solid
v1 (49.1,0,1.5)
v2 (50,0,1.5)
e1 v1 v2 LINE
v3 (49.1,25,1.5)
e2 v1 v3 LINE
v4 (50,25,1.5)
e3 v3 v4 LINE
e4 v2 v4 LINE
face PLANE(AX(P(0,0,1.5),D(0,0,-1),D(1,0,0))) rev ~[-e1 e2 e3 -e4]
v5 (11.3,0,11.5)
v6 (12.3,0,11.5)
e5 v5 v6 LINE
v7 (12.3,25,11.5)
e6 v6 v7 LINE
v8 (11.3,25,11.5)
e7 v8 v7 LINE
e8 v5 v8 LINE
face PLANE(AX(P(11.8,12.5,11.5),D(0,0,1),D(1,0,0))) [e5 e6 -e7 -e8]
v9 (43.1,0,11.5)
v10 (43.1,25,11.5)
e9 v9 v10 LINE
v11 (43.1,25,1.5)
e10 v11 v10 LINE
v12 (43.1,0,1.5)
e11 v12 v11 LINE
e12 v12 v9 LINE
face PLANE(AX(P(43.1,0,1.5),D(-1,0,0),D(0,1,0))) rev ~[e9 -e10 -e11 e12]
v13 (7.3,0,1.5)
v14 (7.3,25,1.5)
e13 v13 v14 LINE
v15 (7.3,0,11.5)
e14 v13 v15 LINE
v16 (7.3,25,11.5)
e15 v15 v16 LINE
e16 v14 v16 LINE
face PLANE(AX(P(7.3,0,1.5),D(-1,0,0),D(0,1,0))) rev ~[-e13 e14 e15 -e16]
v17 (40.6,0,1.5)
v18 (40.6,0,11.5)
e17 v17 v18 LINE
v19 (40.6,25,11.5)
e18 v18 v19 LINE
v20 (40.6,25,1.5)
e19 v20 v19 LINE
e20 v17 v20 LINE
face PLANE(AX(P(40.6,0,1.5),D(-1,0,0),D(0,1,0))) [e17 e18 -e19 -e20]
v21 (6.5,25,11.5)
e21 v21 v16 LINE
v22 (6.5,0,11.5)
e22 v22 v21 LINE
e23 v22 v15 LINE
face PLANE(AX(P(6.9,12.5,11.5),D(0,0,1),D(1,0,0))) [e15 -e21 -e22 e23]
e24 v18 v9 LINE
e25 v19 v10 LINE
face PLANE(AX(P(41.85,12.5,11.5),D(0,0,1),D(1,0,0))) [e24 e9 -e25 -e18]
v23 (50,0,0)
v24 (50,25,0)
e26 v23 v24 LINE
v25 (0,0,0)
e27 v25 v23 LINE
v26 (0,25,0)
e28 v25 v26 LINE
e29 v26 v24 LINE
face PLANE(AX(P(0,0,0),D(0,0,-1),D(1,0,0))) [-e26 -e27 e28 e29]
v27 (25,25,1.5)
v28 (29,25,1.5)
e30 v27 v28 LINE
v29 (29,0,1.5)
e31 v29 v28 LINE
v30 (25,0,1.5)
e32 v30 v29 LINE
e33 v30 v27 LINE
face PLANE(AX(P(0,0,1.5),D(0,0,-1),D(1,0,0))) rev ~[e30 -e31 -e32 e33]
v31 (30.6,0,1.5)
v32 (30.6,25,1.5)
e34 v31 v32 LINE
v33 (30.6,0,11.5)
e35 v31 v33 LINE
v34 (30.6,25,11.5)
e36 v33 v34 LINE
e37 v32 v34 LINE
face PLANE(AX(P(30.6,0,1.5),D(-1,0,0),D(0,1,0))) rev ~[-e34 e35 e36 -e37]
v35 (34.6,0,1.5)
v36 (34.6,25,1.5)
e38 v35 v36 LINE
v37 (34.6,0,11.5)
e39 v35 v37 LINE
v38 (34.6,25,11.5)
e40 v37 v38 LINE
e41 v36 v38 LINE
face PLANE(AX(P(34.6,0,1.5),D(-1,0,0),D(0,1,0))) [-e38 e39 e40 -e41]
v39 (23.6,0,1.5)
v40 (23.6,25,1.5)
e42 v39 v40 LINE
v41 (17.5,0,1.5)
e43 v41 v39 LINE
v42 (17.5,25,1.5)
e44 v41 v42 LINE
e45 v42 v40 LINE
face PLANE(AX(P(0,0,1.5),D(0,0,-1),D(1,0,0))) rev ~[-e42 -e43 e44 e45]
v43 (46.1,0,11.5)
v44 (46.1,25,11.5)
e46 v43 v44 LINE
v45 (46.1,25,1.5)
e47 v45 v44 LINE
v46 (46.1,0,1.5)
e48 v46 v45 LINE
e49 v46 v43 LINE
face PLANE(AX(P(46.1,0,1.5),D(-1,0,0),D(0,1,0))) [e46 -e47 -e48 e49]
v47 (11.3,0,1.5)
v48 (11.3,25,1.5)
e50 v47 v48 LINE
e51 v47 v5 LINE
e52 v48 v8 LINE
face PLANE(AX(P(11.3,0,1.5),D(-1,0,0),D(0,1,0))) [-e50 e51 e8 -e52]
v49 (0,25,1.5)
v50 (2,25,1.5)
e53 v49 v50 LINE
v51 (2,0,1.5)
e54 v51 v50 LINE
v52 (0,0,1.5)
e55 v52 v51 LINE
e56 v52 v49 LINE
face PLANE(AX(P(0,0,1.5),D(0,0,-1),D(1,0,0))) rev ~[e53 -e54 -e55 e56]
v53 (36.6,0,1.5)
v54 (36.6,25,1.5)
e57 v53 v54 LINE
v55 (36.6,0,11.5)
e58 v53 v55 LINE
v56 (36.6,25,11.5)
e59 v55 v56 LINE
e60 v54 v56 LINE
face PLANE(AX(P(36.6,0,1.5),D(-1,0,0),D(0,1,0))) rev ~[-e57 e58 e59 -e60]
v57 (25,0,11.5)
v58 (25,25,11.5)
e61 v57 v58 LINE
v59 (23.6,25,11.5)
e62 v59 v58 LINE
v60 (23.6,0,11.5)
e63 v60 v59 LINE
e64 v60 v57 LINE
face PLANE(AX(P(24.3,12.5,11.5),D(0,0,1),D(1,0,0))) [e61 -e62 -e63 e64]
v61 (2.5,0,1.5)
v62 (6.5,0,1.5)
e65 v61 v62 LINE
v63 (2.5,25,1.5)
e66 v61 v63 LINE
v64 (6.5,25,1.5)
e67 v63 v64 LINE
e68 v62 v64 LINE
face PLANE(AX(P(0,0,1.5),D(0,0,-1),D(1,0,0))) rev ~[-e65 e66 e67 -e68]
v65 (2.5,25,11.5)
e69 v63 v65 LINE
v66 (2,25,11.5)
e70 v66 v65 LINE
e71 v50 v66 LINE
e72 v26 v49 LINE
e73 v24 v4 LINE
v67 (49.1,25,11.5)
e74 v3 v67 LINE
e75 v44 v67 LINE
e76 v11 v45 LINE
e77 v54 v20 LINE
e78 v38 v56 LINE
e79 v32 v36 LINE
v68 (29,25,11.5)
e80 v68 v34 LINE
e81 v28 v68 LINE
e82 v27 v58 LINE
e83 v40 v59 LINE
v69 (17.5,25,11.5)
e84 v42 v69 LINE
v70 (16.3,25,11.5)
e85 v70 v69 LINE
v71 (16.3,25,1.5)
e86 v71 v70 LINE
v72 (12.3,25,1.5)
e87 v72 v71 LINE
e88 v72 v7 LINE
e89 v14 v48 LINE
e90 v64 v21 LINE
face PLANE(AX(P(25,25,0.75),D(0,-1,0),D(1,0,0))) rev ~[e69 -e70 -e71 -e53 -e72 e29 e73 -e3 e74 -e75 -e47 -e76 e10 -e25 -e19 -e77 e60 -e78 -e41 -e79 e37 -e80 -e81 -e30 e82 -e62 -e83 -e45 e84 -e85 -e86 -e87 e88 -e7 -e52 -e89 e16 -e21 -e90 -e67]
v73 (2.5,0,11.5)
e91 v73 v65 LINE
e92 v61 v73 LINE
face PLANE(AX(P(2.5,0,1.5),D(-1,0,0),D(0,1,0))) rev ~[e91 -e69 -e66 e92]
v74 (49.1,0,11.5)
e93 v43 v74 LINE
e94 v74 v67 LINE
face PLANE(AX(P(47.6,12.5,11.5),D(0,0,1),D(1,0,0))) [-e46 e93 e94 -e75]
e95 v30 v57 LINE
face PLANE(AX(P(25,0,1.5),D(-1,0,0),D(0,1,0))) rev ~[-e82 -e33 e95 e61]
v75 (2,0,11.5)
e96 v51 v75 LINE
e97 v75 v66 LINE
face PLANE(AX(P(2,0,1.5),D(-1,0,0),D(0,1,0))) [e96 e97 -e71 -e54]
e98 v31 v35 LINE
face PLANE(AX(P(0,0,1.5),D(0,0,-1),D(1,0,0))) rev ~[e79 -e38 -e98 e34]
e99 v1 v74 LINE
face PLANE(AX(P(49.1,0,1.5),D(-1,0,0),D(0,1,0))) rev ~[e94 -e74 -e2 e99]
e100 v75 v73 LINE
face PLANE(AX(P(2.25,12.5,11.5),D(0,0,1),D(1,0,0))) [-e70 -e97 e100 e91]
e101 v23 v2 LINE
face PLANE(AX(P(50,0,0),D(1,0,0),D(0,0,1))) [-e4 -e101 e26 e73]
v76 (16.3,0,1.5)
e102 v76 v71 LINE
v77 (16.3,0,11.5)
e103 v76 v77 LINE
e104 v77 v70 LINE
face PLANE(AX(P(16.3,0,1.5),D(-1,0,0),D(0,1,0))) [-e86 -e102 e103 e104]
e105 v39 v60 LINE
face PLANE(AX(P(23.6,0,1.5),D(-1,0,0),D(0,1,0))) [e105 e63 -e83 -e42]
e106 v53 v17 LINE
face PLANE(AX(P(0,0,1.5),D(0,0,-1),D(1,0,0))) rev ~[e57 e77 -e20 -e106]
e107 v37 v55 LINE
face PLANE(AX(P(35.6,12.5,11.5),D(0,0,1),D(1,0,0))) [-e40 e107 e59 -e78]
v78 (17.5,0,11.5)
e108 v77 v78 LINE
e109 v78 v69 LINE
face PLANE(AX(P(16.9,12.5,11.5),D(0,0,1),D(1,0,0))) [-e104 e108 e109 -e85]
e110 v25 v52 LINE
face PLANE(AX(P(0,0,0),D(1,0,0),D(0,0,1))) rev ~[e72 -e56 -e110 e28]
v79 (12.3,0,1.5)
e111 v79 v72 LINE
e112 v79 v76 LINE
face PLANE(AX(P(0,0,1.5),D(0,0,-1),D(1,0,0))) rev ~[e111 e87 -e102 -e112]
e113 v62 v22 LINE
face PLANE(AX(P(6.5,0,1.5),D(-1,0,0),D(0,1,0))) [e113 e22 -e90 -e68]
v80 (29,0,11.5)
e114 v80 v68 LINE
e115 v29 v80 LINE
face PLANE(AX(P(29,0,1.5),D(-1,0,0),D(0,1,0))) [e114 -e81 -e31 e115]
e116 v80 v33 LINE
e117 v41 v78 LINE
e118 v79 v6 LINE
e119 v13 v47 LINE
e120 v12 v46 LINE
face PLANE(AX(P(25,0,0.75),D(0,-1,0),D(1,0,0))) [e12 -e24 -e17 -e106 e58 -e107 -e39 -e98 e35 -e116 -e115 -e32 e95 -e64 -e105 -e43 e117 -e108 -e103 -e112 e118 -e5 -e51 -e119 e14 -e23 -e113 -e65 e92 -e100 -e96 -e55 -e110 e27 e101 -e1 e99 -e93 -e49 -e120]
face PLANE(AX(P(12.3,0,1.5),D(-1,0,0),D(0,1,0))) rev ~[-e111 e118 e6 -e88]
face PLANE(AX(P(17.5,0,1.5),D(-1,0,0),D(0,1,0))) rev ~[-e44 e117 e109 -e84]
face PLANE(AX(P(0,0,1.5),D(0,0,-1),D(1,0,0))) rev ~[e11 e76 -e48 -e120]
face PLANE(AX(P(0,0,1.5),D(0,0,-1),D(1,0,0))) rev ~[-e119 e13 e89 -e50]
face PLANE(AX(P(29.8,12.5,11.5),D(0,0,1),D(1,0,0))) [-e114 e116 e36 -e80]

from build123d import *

# Parameters (mm, degrees)
F0_W     = 50
F0_H     = 1.5
F1_DEPTH = 25
F3_W     = 0.5
F3_H     = 25
F3_W_2   = 0.8
F3_W_3   = 1
F3_W_4   = 1.4
F3_W_5   = 1.2
F3_W_6   = 1.6
F3_W_7   = 2
F3_W_8   = 2.5
F3_W_9   = 3
F4_DEPTH = 10


with BuildPart() as f1:
    # F0 (on Front) → F1 (new body)
    with BuildSketch(Plane.XZ):
        with Locations((25, 0.75)):
            Rectangle(F0_W, F0_H)
    extrude(amount=-F1_DEPTH)

    # F3 (on offset) → F4 (join)
    with BuildSketch(Plane.XY.offset(1.5)):
        with Locations((2.25, 12.5)):
            Rectangle(F3_W, F3_H)
        with Locations((6.9, 12.5)):
            Rectangle(F3_W_2, F3_H)
        with Locations((11.8, 12.5)):
            Rectangle(F3_W_3, F3_H)
        with Locations((24.3, 12.5)):
            Rectangle(F3_W_4, F3_H)
        with Locations((16.9, 12.5)):
            Rectangle(F3_W_5, F3_H)
        with Locations((29.8, 12.5)):
            Rectangle(F3_W_6, F3_H)
        with Locations((35.6, 12.5)):
            Rectangle(F3_W_7, F3_H)
        with Locations((41.85, 12.5)):
            Rectangle(F3_W_8, F3_H)
        with Locations((47.6, 12.5)):
            Rectangle(F3_W_9, F3_H)
    extrude(amount=F4_DEPTH)


solid = f1.part
